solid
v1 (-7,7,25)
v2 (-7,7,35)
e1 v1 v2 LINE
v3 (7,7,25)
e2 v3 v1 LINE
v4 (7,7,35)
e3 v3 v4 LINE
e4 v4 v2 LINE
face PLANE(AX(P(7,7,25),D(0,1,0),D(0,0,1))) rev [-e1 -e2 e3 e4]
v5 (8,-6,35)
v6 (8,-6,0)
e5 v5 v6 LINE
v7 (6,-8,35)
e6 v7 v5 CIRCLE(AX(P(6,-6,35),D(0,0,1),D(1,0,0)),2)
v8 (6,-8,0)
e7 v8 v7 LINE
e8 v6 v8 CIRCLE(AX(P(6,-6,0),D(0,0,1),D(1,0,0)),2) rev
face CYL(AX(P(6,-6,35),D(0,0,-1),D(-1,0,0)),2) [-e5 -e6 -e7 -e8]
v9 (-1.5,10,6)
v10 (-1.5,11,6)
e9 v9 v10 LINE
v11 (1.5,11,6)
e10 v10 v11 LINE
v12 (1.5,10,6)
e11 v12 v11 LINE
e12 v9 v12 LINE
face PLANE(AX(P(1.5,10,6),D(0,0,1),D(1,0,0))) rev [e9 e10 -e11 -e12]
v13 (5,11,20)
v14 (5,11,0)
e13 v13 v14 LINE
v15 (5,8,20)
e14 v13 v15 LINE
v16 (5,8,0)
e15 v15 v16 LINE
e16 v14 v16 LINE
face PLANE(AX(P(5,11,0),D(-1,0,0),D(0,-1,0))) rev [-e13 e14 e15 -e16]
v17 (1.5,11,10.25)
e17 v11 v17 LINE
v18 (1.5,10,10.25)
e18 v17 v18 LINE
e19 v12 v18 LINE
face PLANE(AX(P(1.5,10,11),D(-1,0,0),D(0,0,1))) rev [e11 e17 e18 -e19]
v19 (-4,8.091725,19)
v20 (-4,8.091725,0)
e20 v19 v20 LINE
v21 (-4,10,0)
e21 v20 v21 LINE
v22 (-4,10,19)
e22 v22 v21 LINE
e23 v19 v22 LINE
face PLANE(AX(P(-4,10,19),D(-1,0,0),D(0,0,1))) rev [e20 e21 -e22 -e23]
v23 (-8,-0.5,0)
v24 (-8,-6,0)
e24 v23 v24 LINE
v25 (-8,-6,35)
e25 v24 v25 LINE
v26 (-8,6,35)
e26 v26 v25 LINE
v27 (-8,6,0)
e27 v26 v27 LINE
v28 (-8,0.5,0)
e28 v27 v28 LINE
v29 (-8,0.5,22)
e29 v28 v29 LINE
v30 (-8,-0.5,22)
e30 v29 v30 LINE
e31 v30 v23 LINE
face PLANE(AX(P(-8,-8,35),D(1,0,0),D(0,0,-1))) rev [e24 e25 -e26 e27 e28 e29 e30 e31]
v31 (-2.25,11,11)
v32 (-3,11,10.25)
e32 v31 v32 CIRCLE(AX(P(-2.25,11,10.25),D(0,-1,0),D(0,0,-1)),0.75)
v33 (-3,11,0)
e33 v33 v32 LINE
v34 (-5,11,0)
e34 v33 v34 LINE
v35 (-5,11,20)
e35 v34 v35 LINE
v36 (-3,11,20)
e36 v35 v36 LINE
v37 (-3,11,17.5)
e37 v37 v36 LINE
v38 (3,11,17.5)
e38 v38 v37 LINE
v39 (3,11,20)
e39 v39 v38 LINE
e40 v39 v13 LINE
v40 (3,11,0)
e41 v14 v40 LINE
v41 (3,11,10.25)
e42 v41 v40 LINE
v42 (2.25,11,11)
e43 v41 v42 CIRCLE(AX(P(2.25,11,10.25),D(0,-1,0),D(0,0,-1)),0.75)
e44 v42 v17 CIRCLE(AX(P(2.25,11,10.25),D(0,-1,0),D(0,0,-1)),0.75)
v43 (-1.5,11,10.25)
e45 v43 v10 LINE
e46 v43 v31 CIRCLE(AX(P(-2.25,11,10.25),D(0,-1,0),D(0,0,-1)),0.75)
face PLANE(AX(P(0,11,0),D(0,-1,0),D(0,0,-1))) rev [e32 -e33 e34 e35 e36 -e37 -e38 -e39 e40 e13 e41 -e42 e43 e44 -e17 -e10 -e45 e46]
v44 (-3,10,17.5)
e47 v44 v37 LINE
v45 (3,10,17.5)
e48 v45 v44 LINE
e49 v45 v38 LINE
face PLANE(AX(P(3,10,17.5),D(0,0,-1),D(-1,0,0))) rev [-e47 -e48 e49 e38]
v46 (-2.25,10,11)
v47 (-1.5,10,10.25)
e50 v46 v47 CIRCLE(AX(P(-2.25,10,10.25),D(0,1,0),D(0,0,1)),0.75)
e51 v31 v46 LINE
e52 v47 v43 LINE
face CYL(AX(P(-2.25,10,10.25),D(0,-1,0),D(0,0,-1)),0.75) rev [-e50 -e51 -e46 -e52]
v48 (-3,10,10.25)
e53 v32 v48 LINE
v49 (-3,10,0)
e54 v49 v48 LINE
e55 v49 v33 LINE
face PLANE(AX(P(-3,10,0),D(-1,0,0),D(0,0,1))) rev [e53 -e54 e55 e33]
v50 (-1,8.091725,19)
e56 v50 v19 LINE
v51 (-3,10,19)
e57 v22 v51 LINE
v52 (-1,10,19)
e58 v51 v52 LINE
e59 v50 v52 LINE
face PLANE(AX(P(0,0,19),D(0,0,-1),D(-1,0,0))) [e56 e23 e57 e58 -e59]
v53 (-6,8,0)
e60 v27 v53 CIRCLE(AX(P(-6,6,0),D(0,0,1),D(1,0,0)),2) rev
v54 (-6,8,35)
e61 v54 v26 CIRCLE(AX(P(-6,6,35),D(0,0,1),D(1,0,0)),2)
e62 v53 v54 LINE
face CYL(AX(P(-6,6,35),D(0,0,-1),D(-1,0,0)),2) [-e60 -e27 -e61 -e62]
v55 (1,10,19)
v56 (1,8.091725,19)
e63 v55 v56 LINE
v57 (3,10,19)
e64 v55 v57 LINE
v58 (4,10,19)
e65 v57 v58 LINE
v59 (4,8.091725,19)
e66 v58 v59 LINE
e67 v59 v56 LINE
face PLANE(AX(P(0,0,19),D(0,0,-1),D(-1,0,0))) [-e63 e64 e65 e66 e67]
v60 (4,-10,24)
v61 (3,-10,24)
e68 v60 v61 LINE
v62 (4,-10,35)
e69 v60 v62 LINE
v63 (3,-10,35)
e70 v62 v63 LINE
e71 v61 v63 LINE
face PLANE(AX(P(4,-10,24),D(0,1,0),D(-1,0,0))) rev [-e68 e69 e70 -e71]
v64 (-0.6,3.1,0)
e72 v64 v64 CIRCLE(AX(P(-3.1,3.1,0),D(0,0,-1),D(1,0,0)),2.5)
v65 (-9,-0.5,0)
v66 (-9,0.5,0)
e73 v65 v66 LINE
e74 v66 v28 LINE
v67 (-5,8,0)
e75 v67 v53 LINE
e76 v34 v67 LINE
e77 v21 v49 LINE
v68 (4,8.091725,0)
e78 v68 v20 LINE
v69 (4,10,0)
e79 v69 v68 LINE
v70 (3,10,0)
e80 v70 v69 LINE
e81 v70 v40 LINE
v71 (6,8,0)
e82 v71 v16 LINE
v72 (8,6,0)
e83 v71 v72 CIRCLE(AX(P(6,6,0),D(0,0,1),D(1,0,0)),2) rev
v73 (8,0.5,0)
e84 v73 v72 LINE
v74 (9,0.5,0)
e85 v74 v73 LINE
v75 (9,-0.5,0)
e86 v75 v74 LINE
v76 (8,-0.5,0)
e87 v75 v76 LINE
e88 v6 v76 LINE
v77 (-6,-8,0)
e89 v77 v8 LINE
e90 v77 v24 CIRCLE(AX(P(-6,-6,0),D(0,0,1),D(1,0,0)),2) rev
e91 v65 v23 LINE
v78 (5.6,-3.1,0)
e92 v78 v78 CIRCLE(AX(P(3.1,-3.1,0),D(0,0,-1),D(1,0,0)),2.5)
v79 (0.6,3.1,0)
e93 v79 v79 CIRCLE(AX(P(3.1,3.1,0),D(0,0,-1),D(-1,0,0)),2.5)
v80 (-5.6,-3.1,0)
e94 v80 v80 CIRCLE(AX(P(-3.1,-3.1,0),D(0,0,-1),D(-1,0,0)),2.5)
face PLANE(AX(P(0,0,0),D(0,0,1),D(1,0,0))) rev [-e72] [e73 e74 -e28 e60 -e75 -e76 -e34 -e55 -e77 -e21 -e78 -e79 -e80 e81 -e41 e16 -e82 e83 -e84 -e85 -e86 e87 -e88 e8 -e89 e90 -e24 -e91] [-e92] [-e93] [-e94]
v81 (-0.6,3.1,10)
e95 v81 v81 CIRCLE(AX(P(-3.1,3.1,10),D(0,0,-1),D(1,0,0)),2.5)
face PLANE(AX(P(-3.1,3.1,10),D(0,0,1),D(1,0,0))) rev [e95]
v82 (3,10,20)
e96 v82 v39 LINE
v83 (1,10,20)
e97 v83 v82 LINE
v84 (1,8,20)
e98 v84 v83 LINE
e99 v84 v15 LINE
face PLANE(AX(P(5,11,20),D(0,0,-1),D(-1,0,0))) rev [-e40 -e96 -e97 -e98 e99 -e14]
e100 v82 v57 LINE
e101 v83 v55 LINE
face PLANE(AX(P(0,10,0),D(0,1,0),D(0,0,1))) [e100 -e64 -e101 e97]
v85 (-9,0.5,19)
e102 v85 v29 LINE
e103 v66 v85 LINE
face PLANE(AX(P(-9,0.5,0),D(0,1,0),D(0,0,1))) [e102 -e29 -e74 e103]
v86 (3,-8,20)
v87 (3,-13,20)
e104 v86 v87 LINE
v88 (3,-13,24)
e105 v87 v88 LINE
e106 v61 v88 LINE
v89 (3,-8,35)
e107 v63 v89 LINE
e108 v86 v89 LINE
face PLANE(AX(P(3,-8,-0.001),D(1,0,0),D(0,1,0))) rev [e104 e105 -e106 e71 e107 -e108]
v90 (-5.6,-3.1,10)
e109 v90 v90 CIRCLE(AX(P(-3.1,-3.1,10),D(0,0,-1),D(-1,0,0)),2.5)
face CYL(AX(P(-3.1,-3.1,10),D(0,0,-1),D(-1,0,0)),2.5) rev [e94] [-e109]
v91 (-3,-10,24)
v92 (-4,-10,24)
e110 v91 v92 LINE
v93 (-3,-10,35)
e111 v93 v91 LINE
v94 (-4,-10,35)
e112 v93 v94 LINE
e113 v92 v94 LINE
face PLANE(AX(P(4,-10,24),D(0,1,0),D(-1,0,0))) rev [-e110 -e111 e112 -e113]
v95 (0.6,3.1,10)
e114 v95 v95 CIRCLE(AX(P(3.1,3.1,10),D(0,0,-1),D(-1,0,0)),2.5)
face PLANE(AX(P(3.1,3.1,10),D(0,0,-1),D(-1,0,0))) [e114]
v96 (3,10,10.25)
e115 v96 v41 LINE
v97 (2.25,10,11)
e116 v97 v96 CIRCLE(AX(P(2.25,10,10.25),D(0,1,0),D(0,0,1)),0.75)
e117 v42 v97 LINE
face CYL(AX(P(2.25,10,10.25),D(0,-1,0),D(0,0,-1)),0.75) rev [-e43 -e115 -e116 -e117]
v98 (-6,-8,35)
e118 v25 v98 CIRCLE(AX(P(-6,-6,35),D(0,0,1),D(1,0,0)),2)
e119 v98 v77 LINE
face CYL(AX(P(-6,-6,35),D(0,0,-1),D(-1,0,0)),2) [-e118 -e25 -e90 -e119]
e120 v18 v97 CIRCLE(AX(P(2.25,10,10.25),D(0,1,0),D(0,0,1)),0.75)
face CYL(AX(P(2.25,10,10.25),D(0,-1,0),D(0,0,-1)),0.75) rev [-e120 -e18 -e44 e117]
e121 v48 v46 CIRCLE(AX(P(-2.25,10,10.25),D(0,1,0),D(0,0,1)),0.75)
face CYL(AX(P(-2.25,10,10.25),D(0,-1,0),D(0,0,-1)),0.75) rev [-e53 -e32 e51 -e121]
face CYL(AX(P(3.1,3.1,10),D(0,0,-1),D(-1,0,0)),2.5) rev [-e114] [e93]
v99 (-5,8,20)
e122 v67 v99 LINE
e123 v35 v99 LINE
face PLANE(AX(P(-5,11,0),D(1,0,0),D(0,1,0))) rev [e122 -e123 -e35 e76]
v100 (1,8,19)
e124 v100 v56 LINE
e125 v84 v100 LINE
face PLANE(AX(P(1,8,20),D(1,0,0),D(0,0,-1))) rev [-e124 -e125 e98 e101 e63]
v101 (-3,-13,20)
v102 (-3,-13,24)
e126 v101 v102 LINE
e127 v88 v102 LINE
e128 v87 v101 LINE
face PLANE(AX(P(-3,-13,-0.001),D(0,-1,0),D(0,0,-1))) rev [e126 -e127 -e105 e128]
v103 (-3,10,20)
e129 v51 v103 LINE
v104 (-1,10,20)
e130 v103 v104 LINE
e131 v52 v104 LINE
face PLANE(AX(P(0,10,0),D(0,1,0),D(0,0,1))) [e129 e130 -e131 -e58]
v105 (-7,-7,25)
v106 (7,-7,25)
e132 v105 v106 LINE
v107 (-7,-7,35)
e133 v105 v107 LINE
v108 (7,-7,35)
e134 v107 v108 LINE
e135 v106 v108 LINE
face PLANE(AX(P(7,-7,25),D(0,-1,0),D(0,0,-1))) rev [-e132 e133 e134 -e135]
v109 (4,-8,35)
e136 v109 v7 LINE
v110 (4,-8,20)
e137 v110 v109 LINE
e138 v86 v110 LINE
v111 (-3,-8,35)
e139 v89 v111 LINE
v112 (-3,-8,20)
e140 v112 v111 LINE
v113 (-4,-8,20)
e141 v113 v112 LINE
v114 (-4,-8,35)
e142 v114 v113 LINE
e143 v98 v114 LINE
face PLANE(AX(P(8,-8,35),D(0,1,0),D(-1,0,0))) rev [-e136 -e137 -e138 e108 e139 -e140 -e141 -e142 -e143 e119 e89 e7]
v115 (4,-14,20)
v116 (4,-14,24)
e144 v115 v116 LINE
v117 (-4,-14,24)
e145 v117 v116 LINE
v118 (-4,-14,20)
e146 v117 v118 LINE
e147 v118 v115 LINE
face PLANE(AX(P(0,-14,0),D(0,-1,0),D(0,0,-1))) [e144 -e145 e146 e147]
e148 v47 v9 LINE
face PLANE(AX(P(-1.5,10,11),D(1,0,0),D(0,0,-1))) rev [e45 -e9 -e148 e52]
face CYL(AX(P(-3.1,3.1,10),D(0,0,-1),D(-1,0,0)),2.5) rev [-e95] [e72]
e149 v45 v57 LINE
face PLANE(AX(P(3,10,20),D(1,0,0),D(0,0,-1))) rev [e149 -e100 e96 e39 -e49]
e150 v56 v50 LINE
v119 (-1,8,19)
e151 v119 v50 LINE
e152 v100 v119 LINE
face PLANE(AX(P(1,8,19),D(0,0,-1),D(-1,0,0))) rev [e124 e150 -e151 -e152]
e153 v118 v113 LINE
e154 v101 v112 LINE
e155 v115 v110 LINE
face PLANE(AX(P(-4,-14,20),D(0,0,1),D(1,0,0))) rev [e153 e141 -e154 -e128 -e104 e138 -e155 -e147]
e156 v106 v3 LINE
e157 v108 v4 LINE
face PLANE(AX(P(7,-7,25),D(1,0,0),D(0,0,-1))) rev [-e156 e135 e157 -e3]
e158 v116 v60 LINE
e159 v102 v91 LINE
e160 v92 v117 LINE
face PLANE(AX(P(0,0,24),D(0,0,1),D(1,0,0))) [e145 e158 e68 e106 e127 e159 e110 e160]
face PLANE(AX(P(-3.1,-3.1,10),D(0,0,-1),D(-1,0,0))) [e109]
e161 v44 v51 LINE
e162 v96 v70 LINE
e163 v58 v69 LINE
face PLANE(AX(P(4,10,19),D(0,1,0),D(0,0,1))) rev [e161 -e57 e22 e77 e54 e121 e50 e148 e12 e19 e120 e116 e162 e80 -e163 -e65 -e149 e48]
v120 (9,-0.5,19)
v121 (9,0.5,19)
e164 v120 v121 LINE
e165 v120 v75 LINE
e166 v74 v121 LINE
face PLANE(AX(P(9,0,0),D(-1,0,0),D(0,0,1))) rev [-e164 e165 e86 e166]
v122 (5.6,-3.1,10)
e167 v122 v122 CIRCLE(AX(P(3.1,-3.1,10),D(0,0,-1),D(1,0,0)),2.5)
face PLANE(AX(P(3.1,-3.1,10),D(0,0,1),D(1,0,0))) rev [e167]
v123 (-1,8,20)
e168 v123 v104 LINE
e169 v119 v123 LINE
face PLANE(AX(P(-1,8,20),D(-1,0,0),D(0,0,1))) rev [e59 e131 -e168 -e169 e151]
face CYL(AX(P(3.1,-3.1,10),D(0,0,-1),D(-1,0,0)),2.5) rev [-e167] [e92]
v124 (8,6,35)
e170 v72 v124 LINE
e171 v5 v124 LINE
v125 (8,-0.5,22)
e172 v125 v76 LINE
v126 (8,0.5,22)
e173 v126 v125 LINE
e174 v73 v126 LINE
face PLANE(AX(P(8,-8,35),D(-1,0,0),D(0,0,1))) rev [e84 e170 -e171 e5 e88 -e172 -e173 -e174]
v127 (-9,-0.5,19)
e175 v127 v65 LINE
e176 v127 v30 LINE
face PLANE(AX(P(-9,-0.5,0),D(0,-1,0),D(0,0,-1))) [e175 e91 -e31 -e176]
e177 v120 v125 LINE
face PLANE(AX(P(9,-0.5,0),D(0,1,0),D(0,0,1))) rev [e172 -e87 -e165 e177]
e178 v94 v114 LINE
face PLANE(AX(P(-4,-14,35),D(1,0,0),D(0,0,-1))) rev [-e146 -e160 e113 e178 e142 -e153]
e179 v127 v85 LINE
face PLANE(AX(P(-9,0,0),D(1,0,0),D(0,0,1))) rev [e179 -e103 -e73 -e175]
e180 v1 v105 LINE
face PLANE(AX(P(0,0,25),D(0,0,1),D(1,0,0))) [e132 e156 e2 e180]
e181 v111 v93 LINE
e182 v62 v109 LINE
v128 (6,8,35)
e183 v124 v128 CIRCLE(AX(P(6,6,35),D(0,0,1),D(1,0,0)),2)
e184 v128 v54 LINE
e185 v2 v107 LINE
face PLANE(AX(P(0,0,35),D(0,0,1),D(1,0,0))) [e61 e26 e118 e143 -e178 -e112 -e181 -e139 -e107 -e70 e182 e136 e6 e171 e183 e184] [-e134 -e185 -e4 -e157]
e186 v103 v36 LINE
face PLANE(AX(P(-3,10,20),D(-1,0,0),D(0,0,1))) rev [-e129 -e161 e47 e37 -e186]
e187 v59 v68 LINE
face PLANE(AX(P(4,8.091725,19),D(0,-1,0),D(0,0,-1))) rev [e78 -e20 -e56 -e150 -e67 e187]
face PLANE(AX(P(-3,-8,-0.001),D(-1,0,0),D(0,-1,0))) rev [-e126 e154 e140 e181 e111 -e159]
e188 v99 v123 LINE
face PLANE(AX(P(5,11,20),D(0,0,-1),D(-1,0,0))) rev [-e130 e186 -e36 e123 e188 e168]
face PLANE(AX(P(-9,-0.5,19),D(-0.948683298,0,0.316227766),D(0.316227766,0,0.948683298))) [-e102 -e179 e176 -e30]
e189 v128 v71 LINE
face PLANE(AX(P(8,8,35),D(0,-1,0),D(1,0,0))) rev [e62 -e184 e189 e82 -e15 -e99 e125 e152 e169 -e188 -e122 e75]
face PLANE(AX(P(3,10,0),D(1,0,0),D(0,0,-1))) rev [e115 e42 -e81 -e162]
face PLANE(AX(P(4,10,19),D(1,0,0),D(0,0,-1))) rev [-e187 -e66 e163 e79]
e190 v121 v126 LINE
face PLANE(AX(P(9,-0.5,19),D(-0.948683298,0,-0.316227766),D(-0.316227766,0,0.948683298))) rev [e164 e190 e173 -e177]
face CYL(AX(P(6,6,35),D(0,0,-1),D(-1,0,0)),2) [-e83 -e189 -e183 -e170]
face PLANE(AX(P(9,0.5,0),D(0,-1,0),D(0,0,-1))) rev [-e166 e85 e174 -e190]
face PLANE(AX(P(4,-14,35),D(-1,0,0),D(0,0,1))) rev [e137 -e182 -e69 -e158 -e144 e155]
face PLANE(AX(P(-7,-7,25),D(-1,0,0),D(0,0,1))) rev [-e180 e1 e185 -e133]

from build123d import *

# Parameters (mm, degrees)
SKETCH_1_W           = 16
SKETCH_1_H           = 16
EXTRUDE_1_DEPTH      = 35
FILLET_1_R           = 2
SKETCH_2_W           = 8
SKETCH_2_H           = 15
EXTRUDE_2_DEPTH      = 6
CUT_EXTRUDE_2_REACH  = 40.536
SKETCH_3_W           = 6
SKETCH_3_H           = 5
SKETCH_7_W           = 8
SKETCH_7_H           = 4
CUT_EXTRUDE_4_DEPTH  = 11
SKETCH_8_W           = 10
SKETCH_8_H           = 20
EXTRUDE_3_DEPTH      = 3
SKETCH_9_W           = 6
SKETCH_9_H           = 2.5
CUT_EXTRUDE_5_DEPTH  = 1
FILLET_2_R           = 0.75
SKETCH_10_R          = 2.5
CUT_EXTRUDE_6_DEPTH  = 10
SKETCH_11_W          = 14
SKETCH_11_H          = 14
CUT_EXTRUDE_7_DEPTH  = 10
SKETCH_12_W          = 8
SKETCH_12_H          = 1.908274713
CUT_EXTRUDE_8_DEPTH  = 19
SKETCH_13_W          = 2
SKETCH_13_H          = 1
CUT_EXTRUDE_9_DEPTH  = 2
SKETCH_14_W          = 22
SKETCH_14_H          = 1
EXTRUDE_4_DEPTH      = 1
CUT_EXTRUDE_10_DEPTH = 1


with BuildPart() as part:
    # ｽｹｯﾁ1 → ﾎﾞｽ - 押し出し1 (new body)
    with BuildSketch(Plane.XY):
        Rectangle(SKETCH_1_W, SKETCH_1_H)
    extrude(amount=EXTRUDE_1_DEPTH)

    # ﾌｨﾚｯﾄ1
    fillet_1_edges = [part.edges().sort_by_distance(p)[0] for p in [
        (-8, 8, 17.5),
        (8, 8, 17.5),
        (8, -8, 17.5),
        (-8, -8, 17.5),
    ]]
    fillet(fillet_1_edges, radius=FILLET_1_R)

    # ｽｹｯﾁ2 → ﾎﾞｽ - 押し出し2 (add)
    with BuildSketch(Plane.XZ.offset(8)):
        with Locations((0, 27.5)):
            Rectangle(SKETCH_2_W, SKETCH_2_H)
    extrude(amount=EXTRUDE_2_DEPTH)

    # ｽｹｯﾁ3 → ｶｯﾄ - 押し出し2 (cut, up to next)
    with BuildSketch(Plane.XY.offset(35), mode=Mode.PRIVATE) as cut_extrude_2_sk1:
        with Locations((0, -10.5)):
            Rectangle(SKETCH_3_W, SKETCH_3_H)
    cut_extrude_2_tool1 = extrude(cut_extrude_2_sk1.sketch, amount=-CUT_EXTRUDE_2_REACH, mode=Mode.PRIVATE) & part.part
    add(cut_extrude_2_tool1.solids().sort_by_distance((0, -10.5, 35))[0], mode=Mode.SUBTRACT)

    # ｽｹｯﾁ7 → ｶｯﾄ - 押し出し4 (cut)
    with BuildSketch(Plane.XY.offset(35)):
        with Locations((0, -12)):
            Rectangle(SKETCH_7_W, SKETCH_7_H)
    extrude(amount=-CUT_EXTRUDE_4_DEPTH, mode=Mode.SUBTRACT)

    # ｽｹｯﾁ8 → ﾎﾞｽ - 押し出し3 (add)
    with BuildSketch(Plane(origin=(0, 8, 0), x_dir=(1, 0, 0), z_dir=(0, 1, 0))):
        with Locations((0, -10)):
            Rectangle(SKETCH_8_W, SKETCH_8_H)
    extrude(amount=EXTRUDE_3_DEPTH)

    # ｽｹｯﾁ9 → ｶｯﾄ - 押し出し5 (cut)
    with BuildSketch(Plane(origin=(0, 11, 0), x_dir=(1, 0, 0), z_dir=(0, 1, 0))):
        Polygon((3, 0), (3, -11), (1.5, -11), (1.5, -6), (-1.5, -6), (-1.5, -11), (-3, -11), (-3, 0), align=None)
        with Locations((0, -18.75)):
            Rectangle(SKETCH_9_W, SKETCH_9_H)
    extrude(amount=-CUT_EXTRUDE_5_DEPTH, mode=Mode.SUBTRACT)

    # ﾌｨﾚｯﾄ2
    fillet_2_edges = [part.edges().sort_by_distance(p)[0] for p in [
        (-3, 10.5, 11),
        (-1.5, 10.5, 11),
        (1.5, 10.5, 11),
        (3, 10.5, 11),
    ]]
    fillet(fillet_2_edges, radius=FILLET_2_R - 0.0001)  # a hair under: the kernel refuses the full size

    # ｽｹｯﾁ10 → ｶｯﾄ - 押し出し6 (cut)
    with BuildSketch(Plane(origin=(0, 0, 0), x_dir=(-1, 0, 0), z_dir=(0, 0, -1))):
        with Locations((-3.1, 3.1)):
            Circle(SKETCH_10_R)
        with Locations(Location((3.1, 3.1, 0), (0, 0, 180))):
            Circle(SKETCH_10_R)
        with Locations((3.1, -3.1)):
            Circle(SKETCH_10_R)
        with Locations(Location((-3.1, -3.1, 0), (0, 0, 180))):
            Circle(SKETCH_10_R)
    extrude(amount=-CUT_EXTRUDE_6_DEPTH, mode=Mode.SUBTRACT)

    # ｽｹｯﾁ11 → ｶｯﾄ - 押し出し7 (cut)
    with BuildSketch(Plane.XY.offset(35)):
        Rectangle(SKETCH_11_W, SKETCH_11_H)
    extrude(amount=-CUT_EXTRUDE_7_DEPTH, mode=Mode.SUBTRACT)

    # ｽｹｯﾁ12 → ｶｯﾄ - 押し出し8 (cut)
    with BuildSketch(Plane(origin=(0, 0, 0), x_dir=(-1, 0, 0), z_dir=(0, 0, -1))):
        with Locations((0, 9.045862644)):
            Rectangle(SKETCH_12_W, SKETCH_12_H)
    extrude(amount=-CUT_EXTRUDE_8_DEPTH, mode=Mode.SUBTRACT)

    # ｽｹｯﾁ13 → ｶｯﾄ - 押し出し9 (cut)
    with BuildSketch(Plane(origin=(0, 10, 0), x_dir=(1, 0, 0), z_dir=(0, 1, 0))):
        with Locations((0, -19.5)):
            Rectangle(SKETCH_13_W, SKETCH_13_H)
    extrude(amount=-CUT_EXTRUDE_9_DEPTH, mode=Mode.SUBTRACT)

    # ｽｹｯﾁ14 → ﾎﾞｽ - 押し出し4 (add)
    with BuildSketch(Plane(origin=(8, 0, 0), x_dir=(0, 0, -1), z_dir=(1, 0, 0))):
        with Locations((-11, 0)):
            Rectangle(SKETCH_14_W, SKETCH_14_H)
    extrude_4 = extrude(amount=EXTRUDE_4_DEPTH)

    # ｽｹｯﾁ16 → ｶｯﾄ - 押し出し10 (cut)
    with BuildSketch(Plane(origin=(0, 0.5, 0), x_dir=(1, 0, 0), z_dir=(0, 1, 0))):
        Polygon((8, -22), (9, -22), (9, -19), align=None)
    cut_extrude_10 = extrude(amount=-CUT_EXTRUDE_10_DEPTH, mode=Mode.SUBTRACT)

    # ﾐﾗｰ1: ﾎﾞｽ - 押し出し4 across plane
    add(extrude_4.mirror(Plane(origin=(0, 0, 0), x_dir=(0, 0, 1), z_dir=(1, 0, 0))))

    # ﾐﾗｰ2: ｶｯﾄ - 押し出し10 across plane
    add(cut_extrude_10.mirror(Plane(origin=(0, 0, 0), x_dir=(0, 0, 1), z_dir=(1, 0, 0))), mode=Mode.SUBTRACT)


solid = part.part
